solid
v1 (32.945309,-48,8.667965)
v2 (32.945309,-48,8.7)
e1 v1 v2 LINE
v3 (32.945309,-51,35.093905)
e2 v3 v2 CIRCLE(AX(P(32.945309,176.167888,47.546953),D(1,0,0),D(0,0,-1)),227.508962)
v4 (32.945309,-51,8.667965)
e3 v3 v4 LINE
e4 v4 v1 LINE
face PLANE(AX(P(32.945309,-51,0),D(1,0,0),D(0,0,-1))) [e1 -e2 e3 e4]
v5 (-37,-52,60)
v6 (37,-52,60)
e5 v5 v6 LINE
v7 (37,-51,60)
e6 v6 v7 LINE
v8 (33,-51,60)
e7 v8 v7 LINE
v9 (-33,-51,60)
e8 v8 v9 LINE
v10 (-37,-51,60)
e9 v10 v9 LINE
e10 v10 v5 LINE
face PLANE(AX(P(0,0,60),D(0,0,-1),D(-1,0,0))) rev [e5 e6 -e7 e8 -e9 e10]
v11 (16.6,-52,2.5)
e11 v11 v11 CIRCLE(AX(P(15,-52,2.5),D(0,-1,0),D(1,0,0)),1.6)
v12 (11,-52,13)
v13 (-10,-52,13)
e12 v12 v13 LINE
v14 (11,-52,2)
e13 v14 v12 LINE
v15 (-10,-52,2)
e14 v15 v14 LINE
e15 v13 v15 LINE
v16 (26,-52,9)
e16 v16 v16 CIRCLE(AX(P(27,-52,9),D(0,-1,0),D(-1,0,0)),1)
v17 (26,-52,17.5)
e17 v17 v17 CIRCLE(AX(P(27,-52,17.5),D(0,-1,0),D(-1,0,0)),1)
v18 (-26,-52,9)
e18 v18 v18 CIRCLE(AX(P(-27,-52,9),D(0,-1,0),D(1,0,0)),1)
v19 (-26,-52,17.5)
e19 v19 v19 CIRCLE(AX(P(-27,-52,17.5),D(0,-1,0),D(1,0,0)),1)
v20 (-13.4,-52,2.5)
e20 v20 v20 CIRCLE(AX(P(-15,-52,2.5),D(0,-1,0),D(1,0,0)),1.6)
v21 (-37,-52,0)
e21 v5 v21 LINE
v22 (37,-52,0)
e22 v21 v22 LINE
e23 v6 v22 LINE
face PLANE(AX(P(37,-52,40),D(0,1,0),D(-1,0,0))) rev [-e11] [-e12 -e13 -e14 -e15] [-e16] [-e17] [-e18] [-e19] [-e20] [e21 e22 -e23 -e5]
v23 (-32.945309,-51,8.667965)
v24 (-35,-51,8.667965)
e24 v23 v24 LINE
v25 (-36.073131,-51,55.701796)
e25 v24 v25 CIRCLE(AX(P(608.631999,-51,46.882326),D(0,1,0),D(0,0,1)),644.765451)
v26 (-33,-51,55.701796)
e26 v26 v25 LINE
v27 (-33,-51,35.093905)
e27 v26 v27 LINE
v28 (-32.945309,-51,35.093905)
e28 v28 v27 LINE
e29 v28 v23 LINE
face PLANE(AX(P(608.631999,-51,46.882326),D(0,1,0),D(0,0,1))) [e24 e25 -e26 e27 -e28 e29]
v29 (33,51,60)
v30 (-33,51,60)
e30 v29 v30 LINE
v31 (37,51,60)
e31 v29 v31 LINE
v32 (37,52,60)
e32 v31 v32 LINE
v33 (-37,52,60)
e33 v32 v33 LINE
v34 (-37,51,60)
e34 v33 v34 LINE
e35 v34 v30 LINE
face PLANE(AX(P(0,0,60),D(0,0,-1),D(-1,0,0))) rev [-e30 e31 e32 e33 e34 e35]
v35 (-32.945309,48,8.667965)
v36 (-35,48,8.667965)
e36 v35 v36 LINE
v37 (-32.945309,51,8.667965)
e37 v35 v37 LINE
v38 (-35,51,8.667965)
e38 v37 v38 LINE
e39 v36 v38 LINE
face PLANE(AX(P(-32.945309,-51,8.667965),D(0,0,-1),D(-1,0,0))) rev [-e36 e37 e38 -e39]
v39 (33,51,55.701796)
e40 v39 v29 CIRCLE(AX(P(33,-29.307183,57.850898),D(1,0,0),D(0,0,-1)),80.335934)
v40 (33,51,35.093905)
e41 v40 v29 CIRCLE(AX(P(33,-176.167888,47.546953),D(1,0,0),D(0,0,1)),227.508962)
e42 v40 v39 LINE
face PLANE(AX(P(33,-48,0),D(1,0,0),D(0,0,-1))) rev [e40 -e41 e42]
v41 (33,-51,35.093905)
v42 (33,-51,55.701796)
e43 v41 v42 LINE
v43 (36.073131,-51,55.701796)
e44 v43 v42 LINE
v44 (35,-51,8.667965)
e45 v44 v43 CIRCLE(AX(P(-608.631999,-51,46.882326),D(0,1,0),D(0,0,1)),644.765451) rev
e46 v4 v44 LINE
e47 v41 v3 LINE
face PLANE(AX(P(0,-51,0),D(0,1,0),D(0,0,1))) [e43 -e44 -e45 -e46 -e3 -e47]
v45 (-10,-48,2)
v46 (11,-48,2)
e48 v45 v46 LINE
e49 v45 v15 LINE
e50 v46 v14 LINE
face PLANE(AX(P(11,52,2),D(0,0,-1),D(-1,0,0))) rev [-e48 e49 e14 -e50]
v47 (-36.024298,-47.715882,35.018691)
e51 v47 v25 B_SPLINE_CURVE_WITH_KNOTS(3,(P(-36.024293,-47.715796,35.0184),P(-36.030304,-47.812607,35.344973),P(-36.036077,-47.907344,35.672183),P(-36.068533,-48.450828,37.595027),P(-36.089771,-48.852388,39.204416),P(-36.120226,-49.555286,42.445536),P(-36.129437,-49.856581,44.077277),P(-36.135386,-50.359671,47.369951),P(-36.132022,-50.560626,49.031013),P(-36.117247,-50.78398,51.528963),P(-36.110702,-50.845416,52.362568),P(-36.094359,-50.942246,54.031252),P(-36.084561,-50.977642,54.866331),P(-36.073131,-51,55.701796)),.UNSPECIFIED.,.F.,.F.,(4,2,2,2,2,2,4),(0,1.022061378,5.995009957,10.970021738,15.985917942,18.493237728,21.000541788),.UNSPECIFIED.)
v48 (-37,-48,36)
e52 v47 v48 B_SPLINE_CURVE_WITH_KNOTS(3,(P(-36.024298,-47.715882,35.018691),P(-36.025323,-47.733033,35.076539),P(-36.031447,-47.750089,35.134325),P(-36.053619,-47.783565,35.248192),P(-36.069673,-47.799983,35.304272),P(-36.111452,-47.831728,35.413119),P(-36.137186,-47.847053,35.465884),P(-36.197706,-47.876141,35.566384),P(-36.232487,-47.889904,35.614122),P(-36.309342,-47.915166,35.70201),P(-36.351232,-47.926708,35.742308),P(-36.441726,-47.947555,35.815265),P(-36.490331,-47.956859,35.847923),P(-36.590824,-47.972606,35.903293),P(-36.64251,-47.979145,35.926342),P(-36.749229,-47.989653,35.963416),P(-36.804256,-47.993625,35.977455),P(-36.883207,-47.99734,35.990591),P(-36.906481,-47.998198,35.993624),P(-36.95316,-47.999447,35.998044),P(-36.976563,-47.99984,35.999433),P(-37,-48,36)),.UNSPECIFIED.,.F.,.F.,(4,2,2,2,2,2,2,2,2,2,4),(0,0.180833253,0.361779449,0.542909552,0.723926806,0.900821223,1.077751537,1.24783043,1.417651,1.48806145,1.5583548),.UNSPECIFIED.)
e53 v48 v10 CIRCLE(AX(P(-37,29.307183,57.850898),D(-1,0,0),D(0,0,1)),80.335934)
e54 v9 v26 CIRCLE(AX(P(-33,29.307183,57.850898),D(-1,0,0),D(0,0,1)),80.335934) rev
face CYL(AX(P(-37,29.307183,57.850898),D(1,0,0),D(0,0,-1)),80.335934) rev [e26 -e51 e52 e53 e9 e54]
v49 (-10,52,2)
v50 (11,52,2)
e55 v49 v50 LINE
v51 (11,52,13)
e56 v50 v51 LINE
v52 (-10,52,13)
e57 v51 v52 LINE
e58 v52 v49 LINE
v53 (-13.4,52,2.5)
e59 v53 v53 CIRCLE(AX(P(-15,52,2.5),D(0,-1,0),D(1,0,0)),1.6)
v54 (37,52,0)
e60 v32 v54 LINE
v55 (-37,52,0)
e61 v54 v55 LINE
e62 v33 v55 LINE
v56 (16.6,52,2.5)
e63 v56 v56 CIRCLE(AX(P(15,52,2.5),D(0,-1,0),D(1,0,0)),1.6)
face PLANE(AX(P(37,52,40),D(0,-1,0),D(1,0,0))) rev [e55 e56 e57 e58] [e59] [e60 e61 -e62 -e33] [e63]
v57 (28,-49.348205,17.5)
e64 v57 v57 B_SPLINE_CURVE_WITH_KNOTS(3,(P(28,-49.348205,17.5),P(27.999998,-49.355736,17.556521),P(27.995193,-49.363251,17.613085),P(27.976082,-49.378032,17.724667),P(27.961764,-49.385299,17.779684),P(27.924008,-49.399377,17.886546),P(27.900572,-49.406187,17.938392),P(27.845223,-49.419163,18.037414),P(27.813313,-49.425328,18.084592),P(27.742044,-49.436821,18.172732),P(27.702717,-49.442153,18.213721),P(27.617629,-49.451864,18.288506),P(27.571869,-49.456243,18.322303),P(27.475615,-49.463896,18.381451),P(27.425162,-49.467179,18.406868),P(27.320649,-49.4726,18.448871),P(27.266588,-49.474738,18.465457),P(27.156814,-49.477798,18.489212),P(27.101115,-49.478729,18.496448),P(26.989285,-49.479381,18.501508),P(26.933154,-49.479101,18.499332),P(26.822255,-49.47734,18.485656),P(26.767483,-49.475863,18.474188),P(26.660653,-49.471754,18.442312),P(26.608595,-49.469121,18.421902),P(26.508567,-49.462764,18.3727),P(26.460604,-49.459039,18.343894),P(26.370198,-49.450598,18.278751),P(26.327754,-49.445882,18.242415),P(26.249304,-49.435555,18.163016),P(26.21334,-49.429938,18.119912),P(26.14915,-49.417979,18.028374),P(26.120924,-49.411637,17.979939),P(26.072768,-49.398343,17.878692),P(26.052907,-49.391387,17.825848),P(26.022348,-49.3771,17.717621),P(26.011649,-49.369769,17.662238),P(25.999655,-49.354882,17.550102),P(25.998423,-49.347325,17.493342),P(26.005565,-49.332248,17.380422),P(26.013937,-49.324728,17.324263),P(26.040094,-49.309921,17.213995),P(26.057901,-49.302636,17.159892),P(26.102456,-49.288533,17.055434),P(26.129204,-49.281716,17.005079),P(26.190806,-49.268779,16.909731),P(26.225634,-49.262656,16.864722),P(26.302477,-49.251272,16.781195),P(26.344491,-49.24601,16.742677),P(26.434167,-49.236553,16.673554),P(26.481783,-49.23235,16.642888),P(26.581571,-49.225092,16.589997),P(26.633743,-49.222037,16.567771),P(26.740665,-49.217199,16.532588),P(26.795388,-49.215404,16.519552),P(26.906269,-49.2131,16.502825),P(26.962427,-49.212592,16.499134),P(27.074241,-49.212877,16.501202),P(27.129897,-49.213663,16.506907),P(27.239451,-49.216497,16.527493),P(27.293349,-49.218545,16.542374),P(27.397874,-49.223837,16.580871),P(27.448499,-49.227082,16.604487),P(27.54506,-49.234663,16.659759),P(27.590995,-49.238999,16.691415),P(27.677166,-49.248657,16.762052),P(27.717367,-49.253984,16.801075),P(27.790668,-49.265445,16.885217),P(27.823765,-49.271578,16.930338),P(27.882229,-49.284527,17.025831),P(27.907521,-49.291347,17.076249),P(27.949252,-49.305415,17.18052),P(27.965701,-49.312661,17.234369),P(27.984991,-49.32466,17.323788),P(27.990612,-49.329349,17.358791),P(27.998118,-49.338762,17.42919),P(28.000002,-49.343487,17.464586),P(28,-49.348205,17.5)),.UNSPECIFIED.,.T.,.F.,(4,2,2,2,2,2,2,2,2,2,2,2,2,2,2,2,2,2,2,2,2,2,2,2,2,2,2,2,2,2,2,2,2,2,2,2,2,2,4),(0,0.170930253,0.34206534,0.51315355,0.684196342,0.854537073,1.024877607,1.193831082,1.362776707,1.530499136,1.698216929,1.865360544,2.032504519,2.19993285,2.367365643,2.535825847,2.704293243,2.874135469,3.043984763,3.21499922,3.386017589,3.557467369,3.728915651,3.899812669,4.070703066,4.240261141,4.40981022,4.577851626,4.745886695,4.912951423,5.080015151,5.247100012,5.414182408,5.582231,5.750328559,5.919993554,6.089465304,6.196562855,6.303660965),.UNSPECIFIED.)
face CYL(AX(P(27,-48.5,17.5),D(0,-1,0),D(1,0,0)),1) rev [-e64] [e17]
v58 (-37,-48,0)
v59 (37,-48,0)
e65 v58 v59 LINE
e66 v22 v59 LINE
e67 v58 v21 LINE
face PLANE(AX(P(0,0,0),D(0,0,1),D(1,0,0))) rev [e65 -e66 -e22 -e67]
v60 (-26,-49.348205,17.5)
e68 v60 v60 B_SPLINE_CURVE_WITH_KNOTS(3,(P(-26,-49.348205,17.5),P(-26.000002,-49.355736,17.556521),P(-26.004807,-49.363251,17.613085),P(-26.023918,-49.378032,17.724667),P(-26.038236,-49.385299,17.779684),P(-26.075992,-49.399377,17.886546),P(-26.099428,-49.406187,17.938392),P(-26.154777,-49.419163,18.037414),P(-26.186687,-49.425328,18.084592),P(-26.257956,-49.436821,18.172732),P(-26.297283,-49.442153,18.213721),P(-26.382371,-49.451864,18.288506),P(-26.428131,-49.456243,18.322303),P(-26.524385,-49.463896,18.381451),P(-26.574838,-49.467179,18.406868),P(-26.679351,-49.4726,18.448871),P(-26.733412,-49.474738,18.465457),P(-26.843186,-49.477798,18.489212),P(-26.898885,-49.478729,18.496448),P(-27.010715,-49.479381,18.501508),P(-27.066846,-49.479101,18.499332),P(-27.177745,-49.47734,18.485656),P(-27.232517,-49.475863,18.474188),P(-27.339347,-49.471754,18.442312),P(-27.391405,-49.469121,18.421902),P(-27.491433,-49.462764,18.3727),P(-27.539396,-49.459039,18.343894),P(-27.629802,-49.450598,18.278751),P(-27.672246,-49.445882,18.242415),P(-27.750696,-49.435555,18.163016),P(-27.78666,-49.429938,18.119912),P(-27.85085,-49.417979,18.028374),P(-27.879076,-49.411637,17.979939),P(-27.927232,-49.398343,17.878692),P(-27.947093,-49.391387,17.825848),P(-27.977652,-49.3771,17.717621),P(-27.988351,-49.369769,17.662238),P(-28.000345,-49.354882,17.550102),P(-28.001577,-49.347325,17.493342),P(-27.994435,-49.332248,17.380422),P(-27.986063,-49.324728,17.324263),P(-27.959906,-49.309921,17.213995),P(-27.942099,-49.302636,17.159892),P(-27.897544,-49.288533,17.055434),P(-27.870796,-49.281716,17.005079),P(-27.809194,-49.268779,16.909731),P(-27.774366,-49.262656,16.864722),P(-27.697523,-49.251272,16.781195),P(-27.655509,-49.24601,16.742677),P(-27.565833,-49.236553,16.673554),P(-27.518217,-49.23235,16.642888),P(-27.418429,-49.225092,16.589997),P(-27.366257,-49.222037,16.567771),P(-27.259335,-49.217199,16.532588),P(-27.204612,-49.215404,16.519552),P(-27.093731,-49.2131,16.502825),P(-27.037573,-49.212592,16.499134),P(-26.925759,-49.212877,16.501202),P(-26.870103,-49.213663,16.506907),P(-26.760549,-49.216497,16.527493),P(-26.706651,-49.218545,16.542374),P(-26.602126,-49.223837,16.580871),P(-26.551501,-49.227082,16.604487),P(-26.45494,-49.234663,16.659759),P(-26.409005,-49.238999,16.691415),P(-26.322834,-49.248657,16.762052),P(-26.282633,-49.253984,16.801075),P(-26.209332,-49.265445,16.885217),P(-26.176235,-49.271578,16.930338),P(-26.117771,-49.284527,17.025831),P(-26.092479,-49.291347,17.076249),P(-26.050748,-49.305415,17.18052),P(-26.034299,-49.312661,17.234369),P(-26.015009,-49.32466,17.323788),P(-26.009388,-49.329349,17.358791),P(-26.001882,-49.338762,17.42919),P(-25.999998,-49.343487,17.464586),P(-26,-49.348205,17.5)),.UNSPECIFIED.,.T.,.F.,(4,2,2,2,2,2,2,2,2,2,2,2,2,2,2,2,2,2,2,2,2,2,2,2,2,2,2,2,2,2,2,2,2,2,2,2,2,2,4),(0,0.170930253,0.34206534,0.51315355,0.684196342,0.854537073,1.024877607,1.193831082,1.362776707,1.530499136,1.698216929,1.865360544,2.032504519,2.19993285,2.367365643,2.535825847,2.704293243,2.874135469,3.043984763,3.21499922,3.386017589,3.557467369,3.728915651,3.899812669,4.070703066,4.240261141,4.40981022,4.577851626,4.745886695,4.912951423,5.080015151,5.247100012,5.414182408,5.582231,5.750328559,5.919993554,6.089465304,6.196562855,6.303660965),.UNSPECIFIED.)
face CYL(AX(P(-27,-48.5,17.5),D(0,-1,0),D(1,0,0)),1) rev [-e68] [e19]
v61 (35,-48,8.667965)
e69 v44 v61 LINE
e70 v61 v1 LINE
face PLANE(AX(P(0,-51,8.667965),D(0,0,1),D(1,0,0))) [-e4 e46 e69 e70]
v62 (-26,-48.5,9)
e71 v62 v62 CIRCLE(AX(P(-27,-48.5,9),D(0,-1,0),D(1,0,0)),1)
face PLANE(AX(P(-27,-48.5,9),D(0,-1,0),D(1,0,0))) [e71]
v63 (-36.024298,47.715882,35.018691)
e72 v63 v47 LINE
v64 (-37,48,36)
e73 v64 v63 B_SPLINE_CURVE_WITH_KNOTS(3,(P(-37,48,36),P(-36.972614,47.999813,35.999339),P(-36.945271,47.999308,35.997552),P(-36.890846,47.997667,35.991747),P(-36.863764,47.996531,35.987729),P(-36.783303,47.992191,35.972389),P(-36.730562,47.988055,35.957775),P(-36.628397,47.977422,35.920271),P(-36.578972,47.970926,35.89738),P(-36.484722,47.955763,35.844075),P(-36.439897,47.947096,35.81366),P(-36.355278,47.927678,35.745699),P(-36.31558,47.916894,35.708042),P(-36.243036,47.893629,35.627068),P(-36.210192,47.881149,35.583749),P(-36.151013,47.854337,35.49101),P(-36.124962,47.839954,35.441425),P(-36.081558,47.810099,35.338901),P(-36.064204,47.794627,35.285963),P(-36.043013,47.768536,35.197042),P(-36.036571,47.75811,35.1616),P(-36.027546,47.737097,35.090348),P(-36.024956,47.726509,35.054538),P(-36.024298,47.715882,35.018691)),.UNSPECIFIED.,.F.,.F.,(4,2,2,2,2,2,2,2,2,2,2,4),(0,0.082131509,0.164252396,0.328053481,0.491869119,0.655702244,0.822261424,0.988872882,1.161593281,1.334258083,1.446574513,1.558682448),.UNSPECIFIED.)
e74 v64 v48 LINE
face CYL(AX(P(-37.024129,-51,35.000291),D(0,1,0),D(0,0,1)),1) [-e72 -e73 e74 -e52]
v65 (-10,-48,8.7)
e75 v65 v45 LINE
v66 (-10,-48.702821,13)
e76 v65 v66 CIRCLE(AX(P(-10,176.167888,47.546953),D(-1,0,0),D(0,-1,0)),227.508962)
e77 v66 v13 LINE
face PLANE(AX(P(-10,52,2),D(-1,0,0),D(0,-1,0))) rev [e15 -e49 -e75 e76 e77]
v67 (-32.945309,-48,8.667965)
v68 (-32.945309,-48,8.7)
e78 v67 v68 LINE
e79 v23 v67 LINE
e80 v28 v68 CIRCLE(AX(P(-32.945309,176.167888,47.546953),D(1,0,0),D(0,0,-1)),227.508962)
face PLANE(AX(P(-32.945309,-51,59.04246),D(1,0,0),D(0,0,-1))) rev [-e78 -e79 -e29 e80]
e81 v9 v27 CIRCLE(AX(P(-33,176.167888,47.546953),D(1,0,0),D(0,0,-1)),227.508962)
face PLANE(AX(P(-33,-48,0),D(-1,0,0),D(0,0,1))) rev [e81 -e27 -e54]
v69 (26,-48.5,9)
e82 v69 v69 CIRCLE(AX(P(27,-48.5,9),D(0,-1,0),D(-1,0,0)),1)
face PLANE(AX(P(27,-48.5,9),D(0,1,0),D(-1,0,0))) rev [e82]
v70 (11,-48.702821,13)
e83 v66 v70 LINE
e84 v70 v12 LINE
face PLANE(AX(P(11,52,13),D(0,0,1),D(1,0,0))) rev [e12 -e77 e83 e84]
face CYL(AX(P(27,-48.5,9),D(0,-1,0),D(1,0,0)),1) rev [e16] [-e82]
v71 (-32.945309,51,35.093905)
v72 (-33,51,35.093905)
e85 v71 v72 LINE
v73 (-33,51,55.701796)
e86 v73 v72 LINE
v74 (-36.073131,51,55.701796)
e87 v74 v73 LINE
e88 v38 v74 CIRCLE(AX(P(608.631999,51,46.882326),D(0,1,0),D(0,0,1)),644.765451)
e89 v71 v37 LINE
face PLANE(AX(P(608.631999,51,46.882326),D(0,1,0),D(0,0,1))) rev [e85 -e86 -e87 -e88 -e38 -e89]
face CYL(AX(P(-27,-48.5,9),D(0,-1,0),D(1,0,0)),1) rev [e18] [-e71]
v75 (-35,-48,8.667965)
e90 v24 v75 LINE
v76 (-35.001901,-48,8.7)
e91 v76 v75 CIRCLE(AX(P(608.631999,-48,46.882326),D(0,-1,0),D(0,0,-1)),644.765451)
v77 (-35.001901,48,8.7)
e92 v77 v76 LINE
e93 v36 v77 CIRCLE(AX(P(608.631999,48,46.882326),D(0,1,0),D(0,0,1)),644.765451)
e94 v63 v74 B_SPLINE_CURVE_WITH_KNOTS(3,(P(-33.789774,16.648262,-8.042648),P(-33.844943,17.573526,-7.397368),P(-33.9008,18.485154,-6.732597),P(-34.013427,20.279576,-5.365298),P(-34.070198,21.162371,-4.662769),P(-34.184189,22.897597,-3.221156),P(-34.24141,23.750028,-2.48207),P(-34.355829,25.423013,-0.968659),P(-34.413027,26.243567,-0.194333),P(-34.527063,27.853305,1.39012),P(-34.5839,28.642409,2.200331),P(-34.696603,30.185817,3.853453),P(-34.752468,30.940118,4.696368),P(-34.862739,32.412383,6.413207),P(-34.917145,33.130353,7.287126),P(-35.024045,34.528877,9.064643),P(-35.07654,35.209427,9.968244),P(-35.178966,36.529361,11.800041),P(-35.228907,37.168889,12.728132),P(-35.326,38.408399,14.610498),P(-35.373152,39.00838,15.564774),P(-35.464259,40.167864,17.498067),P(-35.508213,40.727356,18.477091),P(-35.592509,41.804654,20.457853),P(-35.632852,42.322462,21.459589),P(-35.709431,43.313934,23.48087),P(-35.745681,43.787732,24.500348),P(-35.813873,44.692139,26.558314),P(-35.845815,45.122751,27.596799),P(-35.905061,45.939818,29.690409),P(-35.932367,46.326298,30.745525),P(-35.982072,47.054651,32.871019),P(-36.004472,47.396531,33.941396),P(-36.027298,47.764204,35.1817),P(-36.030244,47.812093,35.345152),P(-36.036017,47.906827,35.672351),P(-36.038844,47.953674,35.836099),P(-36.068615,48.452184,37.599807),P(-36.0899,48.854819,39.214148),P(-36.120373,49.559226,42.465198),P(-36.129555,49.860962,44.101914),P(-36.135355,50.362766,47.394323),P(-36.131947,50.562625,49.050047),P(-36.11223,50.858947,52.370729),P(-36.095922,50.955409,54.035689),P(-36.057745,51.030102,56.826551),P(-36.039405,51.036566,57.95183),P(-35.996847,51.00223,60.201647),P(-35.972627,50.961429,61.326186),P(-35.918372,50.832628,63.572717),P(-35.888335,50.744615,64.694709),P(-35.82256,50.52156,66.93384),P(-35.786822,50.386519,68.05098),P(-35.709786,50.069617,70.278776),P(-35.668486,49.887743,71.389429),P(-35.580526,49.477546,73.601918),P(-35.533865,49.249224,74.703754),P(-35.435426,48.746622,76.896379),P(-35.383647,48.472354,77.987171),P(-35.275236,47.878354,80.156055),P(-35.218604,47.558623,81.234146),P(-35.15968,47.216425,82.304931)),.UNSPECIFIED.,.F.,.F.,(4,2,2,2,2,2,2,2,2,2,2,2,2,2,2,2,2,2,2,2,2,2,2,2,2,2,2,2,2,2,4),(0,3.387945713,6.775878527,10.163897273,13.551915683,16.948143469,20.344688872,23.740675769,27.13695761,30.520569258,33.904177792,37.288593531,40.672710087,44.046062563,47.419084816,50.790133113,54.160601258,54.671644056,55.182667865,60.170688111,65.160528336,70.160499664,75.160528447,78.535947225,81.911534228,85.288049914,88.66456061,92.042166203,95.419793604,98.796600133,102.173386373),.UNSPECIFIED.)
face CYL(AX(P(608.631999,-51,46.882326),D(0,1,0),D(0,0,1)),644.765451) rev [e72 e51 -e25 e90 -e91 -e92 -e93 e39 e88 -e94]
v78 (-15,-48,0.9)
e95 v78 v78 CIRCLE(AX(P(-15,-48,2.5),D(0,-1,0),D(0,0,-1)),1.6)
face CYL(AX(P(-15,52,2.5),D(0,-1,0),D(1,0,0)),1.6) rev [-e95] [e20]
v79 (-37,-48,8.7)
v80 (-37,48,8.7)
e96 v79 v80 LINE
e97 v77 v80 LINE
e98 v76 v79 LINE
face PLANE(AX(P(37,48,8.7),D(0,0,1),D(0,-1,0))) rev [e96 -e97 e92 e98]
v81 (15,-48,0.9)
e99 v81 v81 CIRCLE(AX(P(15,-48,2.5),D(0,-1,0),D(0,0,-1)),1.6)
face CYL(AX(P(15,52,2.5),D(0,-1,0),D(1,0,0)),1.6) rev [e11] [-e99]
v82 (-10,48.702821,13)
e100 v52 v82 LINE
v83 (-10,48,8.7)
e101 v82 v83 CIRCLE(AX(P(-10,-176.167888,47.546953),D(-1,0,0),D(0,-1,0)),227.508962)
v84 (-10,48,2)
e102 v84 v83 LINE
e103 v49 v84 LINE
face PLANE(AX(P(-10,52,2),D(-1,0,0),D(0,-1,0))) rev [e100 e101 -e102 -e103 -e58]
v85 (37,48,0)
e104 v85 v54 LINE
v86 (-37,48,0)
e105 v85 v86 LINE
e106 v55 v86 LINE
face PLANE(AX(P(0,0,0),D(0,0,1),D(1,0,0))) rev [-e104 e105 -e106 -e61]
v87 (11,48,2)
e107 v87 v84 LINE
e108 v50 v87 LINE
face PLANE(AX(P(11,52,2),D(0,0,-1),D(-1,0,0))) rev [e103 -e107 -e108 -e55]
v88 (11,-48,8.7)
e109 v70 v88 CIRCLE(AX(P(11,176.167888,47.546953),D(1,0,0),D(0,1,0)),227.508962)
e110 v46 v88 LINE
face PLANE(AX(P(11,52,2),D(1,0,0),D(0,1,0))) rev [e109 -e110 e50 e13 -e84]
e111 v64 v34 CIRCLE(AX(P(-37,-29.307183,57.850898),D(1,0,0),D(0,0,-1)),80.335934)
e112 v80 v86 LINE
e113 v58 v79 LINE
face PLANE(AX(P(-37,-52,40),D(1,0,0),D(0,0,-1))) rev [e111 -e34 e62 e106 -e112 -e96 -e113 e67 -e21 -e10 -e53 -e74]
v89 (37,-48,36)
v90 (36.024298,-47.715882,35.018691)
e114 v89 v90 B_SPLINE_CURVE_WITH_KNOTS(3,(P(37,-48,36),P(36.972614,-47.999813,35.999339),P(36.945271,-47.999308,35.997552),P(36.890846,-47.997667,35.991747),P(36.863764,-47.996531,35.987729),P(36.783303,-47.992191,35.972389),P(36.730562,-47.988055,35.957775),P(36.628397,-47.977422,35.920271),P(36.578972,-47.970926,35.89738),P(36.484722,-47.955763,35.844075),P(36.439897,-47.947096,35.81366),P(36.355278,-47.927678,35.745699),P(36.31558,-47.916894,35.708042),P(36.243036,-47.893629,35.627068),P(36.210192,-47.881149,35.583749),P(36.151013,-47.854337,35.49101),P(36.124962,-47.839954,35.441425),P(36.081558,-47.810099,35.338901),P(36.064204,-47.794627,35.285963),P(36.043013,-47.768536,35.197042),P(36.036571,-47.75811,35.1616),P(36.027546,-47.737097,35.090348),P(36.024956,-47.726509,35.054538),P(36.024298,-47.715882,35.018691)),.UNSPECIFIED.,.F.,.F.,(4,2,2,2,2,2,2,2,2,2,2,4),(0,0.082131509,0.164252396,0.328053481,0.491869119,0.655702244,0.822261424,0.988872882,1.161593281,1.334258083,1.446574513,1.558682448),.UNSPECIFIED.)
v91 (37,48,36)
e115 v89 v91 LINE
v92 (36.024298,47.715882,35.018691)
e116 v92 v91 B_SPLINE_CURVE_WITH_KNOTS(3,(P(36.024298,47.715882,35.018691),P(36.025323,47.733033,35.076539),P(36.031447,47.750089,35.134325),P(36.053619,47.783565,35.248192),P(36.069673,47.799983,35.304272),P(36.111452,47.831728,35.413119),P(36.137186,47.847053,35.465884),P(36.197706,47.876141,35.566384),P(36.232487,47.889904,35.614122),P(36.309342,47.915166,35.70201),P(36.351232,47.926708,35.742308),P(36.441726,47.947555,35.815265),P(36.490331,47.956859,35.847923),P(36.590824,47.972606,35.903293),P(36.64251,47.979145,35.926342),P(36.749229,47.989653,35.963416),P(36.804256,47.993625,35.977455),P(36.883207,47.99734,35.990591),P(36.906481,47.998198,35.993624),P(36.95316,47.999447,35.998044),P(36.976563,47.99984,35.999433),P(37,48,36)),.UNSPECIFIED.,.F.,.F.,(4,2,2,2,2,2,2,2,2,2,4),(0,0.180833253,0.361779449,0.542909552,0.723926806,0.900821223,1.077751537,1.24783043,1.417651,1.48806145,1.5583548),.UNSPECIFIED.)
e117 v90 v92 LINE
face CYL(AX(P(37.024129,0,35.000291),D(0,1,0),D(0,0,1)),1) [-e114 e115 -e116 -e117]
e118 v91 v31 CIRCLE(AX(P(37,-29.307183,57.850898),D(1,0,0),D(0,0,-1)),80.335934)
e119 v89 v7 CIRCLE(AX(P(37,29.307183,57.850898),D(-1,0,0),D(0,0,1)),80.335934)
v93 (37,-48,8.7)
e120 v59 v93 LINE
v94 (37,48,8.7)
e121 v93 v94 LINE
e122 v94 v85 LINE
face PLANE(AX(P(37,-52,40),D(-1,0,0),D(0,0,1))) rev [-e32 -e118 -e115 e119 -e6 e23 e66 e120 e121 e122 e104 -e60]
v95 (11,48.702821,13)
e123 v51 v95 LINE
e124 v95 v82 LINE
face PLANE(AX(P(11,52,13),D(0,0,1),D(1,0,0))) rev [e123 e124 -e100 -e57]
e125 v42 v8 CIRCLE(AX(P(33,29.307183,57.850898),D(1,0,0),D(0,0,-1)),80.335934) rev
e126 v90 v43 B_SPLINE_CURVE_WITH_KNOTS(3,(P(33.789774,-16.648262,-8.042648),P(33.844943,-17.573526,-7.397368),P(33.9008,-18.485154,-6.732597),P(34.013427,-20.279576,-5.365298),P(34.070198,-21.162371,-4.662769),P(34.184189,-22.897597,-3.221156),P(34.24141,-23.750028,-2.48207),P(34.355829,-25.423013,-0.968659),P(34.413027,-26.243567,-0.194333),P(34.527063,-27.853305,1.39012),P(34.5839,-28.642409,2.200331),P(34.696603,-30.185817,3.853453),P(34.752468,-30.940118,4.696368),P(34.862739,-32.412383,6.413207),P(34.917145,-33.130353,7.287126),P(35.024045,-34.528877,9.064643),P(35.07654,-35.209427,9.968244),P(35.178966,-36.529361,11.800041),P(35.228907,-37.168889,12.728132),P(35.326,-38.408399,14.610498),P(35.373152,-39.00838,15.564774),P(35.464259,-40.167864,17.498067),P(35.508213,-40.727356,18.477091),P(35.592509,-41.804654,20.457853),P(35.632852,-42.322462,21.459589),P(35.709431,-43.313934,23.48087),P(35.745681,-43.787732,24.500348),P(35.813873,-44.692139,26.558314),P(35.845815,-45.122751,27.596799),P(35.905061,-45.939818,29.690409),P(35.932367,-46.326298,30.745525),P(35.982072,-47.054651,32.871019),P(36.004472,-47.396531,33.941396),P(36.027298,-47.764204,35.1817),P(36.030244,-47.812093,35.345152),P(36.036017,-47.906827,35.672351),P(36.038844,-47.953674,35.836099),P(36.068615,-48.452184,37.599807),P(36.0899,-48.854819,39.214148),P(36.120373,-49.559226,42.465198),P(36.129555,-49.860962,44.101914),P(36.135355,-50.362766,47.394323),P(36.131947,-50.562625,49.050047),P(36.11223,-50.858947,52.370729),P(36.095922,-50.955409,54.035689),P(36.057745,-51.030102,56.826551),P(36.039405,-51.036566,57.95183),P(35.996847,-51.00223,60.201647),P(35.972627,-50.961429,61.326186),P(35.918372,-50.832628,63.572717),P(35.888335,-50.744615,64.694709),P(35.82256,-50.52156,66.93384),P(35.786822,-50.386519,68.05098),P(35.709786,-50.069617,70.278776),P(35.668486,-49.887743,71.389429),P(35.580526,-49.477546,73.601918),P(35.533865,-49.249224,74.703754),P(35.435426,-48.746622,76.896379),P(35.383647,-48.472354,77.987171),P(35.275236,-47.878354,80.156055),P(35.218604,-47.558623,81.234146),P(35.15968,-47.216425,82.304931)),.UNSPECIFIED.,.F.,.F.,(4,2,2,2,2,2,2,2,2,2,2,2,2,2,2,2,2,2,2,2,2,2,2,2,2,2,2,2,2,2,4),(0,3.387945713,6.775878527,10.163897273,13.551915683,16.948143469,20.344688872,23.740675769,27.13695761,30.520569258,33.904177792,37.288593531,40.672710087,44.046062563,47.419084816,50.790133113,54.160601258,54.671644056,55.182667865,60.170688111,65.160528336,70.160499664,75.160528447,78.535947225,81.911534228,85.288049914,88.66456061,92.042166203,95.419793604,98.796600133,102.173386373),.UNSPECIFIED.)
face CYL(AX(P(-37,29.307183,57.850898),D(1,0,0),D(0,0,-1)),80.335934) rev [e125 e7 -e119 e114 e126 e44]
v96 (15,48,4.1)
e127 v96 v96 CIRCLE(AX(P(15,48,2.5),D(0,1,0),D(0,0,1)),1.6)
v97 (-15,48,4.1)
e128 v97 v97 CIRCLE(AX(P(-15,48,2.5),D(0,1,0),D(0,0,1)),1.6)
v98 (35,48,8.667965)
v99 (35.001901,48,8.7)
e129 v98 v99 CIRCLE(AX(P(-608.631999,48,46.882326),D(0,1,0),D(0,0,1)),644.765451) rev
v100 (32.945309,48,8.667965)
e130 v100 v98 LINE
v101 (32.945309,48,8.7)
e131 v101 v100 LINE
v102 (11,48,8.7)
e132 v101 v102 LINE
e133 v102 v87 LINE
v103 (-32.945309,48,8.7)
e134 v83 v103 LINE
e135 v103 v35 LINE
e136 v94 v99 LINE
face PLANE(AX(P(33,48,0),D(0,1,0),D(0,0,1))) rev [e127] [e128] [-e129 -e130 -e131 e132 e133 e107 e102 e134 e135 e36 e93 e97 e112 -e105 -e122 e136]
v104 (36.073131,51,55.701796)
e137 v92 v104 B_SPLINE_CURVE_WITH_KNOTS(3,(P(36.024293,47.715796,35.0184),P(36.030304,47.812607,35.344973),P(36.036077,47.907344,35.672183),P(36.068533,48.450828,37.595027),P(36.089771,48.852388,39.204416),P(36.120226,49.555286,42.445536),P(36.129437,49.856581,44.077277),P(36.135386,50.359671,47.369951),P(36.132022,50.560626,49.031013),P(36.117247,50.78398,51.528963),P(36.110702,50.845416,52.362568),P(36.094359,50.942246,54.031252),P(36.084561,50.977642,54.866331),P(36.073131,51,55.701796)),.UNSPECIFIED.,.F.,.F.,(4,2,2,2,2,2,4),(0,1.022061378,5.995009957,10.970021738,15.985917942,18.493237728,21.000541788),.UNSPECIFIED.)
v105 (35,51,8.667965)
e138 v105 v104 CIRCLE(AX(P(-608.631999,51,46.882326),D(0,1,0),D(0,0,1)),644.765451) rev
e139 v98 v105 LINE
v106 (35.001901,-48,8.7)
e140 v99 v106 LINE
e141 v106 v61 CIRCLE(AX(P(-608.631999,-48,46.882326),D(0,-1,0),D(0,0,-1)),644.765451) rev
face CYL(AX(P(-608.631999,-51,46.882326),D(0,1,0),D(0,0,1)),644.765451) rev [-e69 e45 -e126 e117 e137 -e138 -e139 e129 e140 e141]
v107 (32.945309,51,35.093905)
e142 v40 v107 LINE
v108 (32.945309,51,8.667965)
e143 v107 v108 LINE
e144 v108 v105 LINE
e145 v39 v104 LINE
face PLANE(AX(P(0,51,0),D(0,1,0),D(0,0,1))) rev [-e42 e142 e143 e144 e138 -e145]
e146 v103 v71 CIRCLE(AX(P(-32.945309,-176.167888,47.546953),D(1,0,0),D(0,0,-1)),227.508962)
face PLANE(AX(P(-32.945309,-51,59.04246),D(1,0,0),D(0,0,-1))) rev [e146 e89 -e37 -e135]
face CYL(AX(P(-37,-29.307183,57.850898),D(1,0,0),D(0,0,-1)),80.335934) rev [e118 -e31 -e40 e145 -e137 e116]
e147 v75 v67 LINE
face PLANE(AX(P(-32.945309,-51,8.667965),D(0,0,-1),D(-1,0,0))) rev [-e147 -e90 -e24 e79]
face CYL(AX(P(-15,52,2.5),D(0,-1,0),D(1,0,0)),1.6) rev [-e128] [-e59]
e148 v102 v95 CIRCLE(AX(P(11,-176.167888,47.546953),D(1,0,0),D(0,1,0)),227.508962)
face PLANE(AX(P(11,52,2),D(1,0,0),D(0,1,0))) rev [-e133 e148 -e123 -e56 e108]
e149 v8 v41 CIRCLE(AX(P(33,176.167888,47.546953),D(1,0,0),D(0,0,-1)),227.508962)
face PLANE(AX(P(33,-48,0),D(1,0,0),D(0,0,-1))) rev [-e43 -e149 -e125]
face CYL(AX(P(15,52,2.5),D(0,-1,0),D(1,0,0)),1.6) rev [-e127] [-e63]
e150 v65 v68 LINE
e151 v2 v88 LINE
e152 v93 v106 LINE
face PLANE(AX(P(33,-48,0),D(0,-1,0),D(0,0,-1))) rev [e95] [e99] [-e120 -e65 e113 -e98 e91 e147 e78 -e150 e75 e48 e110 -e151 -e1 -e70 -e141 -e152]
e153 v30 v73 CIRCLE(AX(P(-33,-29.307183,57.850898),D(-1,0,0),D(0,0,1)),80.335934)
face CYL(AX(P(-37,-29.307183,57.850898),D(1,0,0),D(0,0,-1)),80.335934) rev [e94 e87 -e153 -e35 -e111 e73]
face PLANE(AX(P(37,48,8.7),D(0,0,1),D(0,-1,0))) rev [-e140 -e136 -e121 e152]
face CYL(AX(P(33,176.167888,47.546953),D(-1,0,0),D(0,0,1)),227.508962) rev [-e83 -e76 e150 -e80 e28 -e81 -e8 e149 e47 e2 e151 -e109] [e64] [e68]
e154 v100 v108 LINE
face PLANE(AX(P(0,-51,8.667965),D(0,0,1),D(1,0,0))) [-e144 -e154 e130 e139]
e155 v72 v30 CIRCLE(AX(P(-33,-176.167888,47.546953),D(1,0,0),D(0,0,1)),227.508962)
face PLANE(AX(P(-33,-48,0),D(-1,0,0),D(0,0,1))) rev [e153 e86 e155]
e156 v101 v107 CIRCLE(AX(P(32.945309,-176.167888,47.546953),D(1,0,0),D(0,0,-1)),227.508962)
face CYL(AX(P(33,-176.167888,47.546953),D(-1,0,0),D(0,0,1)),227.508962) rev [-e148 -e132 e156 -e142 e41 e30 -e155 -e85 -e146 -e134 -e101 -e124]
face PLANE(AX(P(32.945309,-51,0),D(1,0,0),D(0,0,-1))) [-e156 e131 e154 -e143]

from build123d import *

# Parameters (mm, degrees)
SKETCH1_W           = 74
SKETCH1_H           = 104
BOSS_EXTRUDE1_DEPTH = 40
SKETCH2_W           = 66
SKETCH2_H           = 96
CUT_EXTRUDE1_DEPTH  = 40
SKETCH3_R           = 1.6
CUT_EXTRUDE2_DEPTH  = 118.409539646
SKETCH4_W           = 8.7
SKETCH4_H           = 96
CUT_EXTRUDE3_DEPTH  = 99.893882521
SKETCH5_R           = 1
CUT_EXTRUDE4_DEPTH  = 3.5
SKETCH9_W           = 74
SKETCH9_H           = 4
BOSS_EXTRUDE2_DEPTH = 20
CUT_EXTRUDE7_DEPTH  = 66
SKETCH8_W           = 21
SKETCH8_H           = 11
CUT_EXTRUDE10_DEPTH = 126.638369983
SKETCH16_W          = 74
SKETCH16_H          = 96
CUT_EXTRUDE11_DEPTH = 6
CUT_EXTRUDE13_DEPTH = 109.535708513
CUT_EXTRUDE14_DEPTH = 51
FILLET3_R           = 1


with BuildPart() as part:
    # Sketch1 → Boss-Extrude1 (new body)
    with BuildSketch(Plane.XY):
        Rectangle(SKETCH1_W, SKETCH1_H)
    extrude(amount=BOSS_EXTRUDE1_DEPTH)

    # Sketch2 → Cut-Extrude1 (cut)
    with BuildSketch(Plane.XY.offset(40)):
        Rectangle(SKETCH2_W, SKETCH2_H)
    extrude(amount=-CUT_EXTRUDE1_DEPTH, mode=Mode.SUBTRACT)

    # Sketch3 → Cut-Extrude2 (cut, through all)
    with BuildSketch(Plane.XZ.offset(52)):
        with Locations((-15, 2.5)):
            Circle(SKETCH3_R)
        with Locations((15, 2.5)):
            Circle(SKETCH3_R)
    extrude(amount=-CUT_EXTRUDE2_DEPTH, mode=Mode.SUBTRACT)

    # Sketch4 → Cut-Extrude3 (cut, through all)
    with BuildSketch(Plane.ZY.offset(37)):
        with Locations((4.35, 0)):
            Rectangle(SKETCH4_W, SKETCH4_H)
    extrude(amount=-CUT_EXTRUDE3_DEPTH, mode=Mode.SUBTRACT)

    # Sketch5 → Cut-Extrude4 (cut)
    with BuildSketch(Plane.XZ.offset(52)):
        with Locations((-27, 9)):
            Circle(SKETCH5_R)
        with Locations((-27, 17.5)):
            Circle(SKETCH5_R)
        with Locations(Location((27, 9, 0), (0, 0, 180))):
            Circle(SKETCH5_R)
        with Locations(Location((27, 17.5, 0), (0, 0, 180))):
            Circle(SKETCH5_R)
    extrude(amount=-CUT_EXTRUDE4_DEPTH, mode=Mode.SUBTRACT)

    # Sketch9 → Boss-Extrude2 (add)
    with BuildSketch(Plane.XY.offset(40)):
        with Locations((0, -50)):
            Rectangle(SKETCH9_W, SKETCH9_H)
        with Locations((0, 50)):
            Rectangle(SKETCH9_W, SKETCH9_H)
    extrude(amount=BOSS_EXTRUDE2_DEPTH)

    # Sketch11 → Cut-Extrude7 (cut)
    with BuildSketch(Plane(origin=(-33, 0, 0), x_dir=(0, 0, -1), z_dir=(1, 0, 0))):
        with BuildLine():
            Line((-60, -48), (-8.7, -48))
            ThreePointArc((-8.7, -48), (-34.265026612, -50.953044928), (-60, -51))
            Line((-60, -51), (-60, -48))
        make_face()
        with BuildLine():
            Line((-60, 48), (-60, 51))
            ThreePointArc((-60, 51), (-34.265026612, 50.953044928), (-8.7, 48))
            Line((-8.7, 48), (-60, 48))
        make_face()
    extrude(amount=CUT_EXTRUDE7_DEPTH, mode=Mode.SUBTRACT)

    # Sketch8 → Cut-Extrude10 (cut, through all)
    with BuildSketch(Plane.XZ.offset(52)):
        with Locations((0.5, 7.5)):
            Rectangle(SKETCH8_W, SKETCH8_H)
    extrude(amount=-CUT_EXTRUDE10_DEPTH, mode=Mode.SUBTRACT)

    # Sketch16 → Cut-Extrude11 (cut)
    with BuildSketch(Plane.XY.offset(42)):
        Rectangle(SKETCH16_W, SKETCH16_H)
    extrude(amount=-CUT_EXTRUDE11_DEPTH, mode=Mode.SUBTRACT)

    # Sketch18 → Cut-Extrude13 (cut, through all)
    with BuildSketch(Plane(origin=(37, 0, 0), x_dir=(0, 0, -1), z_dir=(1, 0, 0))):
        with BuildLine():
            Line((-60, 51), (-60, 48))
            Line((-60, 48), (-36, 48))
            ThreePointArc((-36, 48), (-47.886451631, 50.40838695), (-60, 51))
        make_face()
        with BuildLine():
            Line((-60, -48), (-36, -48))
            ThreePointArc((-36, -48), (-47.886451631, -50.40838695), (-60, -51))
            Line((-60, -51), (-60, -48))
        make_face()
    extrude(amount=-CUT_EXTRUDE13_DEPTH, mode=Mode.SUBTRACT)

    # Sketch20 → Cut-Extrude14 (cut, symmetric)
    with BuildSketch(Plane(origin=(0, 0, 0), x_dir=(1, 0, 0), z_dir=(0, 1, 0))):
        with BuildLine():
            Line((-36, -60), (-33, -60))
            Line((-33, -60), (-32.94530899, -59.042459963))
            Line((-32.94530899, -59.042459963), (-32.94530899, -8.667965125))
            Line((-32.94530899, -8.667965125), (-35, -8.667965125))
            ThreePointArc((-35, -8.667965125), (-36.011139943, -34.324025039), (-36, -60))
        make_face()
        with BuildLine():
            Line((32.94530899, -8.667965125), (32.94530899, -59.042459963))
            Line((32.94530899, -59.042459963), (33, -60))
            Line((33, -60), (36, -60))
            ThreePointArc((36, -60), (36.011139943, -34.324025039), (35, -8.667965125))
            Line((35, -8.667965125), (32.94530899, -8.667965125))
        make_face()
    extrude(amount=CUT_EXTRUDE14_DEPTH, both=True, mode=Mode.SUBTRACT)

    # Fillet3
    # the kernel refuses this fillet: 1 mm, written as the material it takes off along each edge
    with BuildSketch(Plane(origin=(36.041610271, -50.456283498, 36), x_dir=(1, 0, 0), z_dir=(0, 1, 0))) as fillet3_piece_1_section:
        with BuildLine():
            CenterArc((0.982513399, 1), FILLET3_R, 181.05432328, 88.94567672)
            ThreePointArc((-0.017317299, 0.981599626), (-0.008471821, 0.490803109), (0, 0))
            Line((0, 0), (0.982513399, 0))
        make_face()
    fillet3_piece_1 = extrude(amount=100.912566997, mode=Mode.PRIVATE)
    fillet3_piece_1 = fillet3_piece_1 & Plane(origin=(36.2601728, -29.307183003, 57.850897875), x_dir=(0, 0.9622989266780244, -0.27199407293969147), z_dir=(1, 0, 0)) * Cylinder(80.335933938, 206, mode=Mode.PRIVATE)
    fillet3_piece_1 = fillet3_piece_1 & Plane(origin=(36.2601728, 29.307183003, 57.850897875), x_dir=(0, -0.9622989266780254, -0.27199407293968814), z_dir=(1, 0, 0)) * Cylinder(80.335933938, 206, mode=Mode.PRIVATE)
    add(fillet3_piece_1, mode=Mode.SUBTRACT)
    with BuildSketch(Plane(origin=(-36.041610271, -50.456283498, 36), x_dir=(-1, 0, 0), z_dir=(0, 1, 0))) as fillet3_piece_2_section:
        with BuildLine():
            CenterArc((0.982513399, -1), FILLET3_R, 90, 88.94567672)
            ThreePointArc((-0.017317299, -0.981599626), (-0.008471821, -0.490803109), (0, 0))
            Line((0, 0), (0.982513399, 0))
        make_face()
    fillet3_piece_2 = extrude(amount=100.912566997, mode=Mode.PRIVATE)
    fillet3_piece_2 = fillet3_piece_2 & Plane(origin=(-36.2601728, -29.307183003, 57.850897875), x_dir=(0, 0.9622989266780244, -0.27199407293969147), z_dir=(1, 0, 0)) * Cylinder(80.335933938, 206, mode=Mode.PRIVATE)
    fillet3_piece_2 = fillet3_piece_2 & Plane(origin=(-36.2601728, 29.307183003, 57.850897875), x_dir=(0, -0.9622989266780254, -0.27199407293968814), z_dir=(1, 0, 0)) * Cylinder(80.335933938, 206, mode=Mode.PRIVATE)
    add(fillet3_piece_2, mode=Mode.SUBTRACT)


solid = part.part
